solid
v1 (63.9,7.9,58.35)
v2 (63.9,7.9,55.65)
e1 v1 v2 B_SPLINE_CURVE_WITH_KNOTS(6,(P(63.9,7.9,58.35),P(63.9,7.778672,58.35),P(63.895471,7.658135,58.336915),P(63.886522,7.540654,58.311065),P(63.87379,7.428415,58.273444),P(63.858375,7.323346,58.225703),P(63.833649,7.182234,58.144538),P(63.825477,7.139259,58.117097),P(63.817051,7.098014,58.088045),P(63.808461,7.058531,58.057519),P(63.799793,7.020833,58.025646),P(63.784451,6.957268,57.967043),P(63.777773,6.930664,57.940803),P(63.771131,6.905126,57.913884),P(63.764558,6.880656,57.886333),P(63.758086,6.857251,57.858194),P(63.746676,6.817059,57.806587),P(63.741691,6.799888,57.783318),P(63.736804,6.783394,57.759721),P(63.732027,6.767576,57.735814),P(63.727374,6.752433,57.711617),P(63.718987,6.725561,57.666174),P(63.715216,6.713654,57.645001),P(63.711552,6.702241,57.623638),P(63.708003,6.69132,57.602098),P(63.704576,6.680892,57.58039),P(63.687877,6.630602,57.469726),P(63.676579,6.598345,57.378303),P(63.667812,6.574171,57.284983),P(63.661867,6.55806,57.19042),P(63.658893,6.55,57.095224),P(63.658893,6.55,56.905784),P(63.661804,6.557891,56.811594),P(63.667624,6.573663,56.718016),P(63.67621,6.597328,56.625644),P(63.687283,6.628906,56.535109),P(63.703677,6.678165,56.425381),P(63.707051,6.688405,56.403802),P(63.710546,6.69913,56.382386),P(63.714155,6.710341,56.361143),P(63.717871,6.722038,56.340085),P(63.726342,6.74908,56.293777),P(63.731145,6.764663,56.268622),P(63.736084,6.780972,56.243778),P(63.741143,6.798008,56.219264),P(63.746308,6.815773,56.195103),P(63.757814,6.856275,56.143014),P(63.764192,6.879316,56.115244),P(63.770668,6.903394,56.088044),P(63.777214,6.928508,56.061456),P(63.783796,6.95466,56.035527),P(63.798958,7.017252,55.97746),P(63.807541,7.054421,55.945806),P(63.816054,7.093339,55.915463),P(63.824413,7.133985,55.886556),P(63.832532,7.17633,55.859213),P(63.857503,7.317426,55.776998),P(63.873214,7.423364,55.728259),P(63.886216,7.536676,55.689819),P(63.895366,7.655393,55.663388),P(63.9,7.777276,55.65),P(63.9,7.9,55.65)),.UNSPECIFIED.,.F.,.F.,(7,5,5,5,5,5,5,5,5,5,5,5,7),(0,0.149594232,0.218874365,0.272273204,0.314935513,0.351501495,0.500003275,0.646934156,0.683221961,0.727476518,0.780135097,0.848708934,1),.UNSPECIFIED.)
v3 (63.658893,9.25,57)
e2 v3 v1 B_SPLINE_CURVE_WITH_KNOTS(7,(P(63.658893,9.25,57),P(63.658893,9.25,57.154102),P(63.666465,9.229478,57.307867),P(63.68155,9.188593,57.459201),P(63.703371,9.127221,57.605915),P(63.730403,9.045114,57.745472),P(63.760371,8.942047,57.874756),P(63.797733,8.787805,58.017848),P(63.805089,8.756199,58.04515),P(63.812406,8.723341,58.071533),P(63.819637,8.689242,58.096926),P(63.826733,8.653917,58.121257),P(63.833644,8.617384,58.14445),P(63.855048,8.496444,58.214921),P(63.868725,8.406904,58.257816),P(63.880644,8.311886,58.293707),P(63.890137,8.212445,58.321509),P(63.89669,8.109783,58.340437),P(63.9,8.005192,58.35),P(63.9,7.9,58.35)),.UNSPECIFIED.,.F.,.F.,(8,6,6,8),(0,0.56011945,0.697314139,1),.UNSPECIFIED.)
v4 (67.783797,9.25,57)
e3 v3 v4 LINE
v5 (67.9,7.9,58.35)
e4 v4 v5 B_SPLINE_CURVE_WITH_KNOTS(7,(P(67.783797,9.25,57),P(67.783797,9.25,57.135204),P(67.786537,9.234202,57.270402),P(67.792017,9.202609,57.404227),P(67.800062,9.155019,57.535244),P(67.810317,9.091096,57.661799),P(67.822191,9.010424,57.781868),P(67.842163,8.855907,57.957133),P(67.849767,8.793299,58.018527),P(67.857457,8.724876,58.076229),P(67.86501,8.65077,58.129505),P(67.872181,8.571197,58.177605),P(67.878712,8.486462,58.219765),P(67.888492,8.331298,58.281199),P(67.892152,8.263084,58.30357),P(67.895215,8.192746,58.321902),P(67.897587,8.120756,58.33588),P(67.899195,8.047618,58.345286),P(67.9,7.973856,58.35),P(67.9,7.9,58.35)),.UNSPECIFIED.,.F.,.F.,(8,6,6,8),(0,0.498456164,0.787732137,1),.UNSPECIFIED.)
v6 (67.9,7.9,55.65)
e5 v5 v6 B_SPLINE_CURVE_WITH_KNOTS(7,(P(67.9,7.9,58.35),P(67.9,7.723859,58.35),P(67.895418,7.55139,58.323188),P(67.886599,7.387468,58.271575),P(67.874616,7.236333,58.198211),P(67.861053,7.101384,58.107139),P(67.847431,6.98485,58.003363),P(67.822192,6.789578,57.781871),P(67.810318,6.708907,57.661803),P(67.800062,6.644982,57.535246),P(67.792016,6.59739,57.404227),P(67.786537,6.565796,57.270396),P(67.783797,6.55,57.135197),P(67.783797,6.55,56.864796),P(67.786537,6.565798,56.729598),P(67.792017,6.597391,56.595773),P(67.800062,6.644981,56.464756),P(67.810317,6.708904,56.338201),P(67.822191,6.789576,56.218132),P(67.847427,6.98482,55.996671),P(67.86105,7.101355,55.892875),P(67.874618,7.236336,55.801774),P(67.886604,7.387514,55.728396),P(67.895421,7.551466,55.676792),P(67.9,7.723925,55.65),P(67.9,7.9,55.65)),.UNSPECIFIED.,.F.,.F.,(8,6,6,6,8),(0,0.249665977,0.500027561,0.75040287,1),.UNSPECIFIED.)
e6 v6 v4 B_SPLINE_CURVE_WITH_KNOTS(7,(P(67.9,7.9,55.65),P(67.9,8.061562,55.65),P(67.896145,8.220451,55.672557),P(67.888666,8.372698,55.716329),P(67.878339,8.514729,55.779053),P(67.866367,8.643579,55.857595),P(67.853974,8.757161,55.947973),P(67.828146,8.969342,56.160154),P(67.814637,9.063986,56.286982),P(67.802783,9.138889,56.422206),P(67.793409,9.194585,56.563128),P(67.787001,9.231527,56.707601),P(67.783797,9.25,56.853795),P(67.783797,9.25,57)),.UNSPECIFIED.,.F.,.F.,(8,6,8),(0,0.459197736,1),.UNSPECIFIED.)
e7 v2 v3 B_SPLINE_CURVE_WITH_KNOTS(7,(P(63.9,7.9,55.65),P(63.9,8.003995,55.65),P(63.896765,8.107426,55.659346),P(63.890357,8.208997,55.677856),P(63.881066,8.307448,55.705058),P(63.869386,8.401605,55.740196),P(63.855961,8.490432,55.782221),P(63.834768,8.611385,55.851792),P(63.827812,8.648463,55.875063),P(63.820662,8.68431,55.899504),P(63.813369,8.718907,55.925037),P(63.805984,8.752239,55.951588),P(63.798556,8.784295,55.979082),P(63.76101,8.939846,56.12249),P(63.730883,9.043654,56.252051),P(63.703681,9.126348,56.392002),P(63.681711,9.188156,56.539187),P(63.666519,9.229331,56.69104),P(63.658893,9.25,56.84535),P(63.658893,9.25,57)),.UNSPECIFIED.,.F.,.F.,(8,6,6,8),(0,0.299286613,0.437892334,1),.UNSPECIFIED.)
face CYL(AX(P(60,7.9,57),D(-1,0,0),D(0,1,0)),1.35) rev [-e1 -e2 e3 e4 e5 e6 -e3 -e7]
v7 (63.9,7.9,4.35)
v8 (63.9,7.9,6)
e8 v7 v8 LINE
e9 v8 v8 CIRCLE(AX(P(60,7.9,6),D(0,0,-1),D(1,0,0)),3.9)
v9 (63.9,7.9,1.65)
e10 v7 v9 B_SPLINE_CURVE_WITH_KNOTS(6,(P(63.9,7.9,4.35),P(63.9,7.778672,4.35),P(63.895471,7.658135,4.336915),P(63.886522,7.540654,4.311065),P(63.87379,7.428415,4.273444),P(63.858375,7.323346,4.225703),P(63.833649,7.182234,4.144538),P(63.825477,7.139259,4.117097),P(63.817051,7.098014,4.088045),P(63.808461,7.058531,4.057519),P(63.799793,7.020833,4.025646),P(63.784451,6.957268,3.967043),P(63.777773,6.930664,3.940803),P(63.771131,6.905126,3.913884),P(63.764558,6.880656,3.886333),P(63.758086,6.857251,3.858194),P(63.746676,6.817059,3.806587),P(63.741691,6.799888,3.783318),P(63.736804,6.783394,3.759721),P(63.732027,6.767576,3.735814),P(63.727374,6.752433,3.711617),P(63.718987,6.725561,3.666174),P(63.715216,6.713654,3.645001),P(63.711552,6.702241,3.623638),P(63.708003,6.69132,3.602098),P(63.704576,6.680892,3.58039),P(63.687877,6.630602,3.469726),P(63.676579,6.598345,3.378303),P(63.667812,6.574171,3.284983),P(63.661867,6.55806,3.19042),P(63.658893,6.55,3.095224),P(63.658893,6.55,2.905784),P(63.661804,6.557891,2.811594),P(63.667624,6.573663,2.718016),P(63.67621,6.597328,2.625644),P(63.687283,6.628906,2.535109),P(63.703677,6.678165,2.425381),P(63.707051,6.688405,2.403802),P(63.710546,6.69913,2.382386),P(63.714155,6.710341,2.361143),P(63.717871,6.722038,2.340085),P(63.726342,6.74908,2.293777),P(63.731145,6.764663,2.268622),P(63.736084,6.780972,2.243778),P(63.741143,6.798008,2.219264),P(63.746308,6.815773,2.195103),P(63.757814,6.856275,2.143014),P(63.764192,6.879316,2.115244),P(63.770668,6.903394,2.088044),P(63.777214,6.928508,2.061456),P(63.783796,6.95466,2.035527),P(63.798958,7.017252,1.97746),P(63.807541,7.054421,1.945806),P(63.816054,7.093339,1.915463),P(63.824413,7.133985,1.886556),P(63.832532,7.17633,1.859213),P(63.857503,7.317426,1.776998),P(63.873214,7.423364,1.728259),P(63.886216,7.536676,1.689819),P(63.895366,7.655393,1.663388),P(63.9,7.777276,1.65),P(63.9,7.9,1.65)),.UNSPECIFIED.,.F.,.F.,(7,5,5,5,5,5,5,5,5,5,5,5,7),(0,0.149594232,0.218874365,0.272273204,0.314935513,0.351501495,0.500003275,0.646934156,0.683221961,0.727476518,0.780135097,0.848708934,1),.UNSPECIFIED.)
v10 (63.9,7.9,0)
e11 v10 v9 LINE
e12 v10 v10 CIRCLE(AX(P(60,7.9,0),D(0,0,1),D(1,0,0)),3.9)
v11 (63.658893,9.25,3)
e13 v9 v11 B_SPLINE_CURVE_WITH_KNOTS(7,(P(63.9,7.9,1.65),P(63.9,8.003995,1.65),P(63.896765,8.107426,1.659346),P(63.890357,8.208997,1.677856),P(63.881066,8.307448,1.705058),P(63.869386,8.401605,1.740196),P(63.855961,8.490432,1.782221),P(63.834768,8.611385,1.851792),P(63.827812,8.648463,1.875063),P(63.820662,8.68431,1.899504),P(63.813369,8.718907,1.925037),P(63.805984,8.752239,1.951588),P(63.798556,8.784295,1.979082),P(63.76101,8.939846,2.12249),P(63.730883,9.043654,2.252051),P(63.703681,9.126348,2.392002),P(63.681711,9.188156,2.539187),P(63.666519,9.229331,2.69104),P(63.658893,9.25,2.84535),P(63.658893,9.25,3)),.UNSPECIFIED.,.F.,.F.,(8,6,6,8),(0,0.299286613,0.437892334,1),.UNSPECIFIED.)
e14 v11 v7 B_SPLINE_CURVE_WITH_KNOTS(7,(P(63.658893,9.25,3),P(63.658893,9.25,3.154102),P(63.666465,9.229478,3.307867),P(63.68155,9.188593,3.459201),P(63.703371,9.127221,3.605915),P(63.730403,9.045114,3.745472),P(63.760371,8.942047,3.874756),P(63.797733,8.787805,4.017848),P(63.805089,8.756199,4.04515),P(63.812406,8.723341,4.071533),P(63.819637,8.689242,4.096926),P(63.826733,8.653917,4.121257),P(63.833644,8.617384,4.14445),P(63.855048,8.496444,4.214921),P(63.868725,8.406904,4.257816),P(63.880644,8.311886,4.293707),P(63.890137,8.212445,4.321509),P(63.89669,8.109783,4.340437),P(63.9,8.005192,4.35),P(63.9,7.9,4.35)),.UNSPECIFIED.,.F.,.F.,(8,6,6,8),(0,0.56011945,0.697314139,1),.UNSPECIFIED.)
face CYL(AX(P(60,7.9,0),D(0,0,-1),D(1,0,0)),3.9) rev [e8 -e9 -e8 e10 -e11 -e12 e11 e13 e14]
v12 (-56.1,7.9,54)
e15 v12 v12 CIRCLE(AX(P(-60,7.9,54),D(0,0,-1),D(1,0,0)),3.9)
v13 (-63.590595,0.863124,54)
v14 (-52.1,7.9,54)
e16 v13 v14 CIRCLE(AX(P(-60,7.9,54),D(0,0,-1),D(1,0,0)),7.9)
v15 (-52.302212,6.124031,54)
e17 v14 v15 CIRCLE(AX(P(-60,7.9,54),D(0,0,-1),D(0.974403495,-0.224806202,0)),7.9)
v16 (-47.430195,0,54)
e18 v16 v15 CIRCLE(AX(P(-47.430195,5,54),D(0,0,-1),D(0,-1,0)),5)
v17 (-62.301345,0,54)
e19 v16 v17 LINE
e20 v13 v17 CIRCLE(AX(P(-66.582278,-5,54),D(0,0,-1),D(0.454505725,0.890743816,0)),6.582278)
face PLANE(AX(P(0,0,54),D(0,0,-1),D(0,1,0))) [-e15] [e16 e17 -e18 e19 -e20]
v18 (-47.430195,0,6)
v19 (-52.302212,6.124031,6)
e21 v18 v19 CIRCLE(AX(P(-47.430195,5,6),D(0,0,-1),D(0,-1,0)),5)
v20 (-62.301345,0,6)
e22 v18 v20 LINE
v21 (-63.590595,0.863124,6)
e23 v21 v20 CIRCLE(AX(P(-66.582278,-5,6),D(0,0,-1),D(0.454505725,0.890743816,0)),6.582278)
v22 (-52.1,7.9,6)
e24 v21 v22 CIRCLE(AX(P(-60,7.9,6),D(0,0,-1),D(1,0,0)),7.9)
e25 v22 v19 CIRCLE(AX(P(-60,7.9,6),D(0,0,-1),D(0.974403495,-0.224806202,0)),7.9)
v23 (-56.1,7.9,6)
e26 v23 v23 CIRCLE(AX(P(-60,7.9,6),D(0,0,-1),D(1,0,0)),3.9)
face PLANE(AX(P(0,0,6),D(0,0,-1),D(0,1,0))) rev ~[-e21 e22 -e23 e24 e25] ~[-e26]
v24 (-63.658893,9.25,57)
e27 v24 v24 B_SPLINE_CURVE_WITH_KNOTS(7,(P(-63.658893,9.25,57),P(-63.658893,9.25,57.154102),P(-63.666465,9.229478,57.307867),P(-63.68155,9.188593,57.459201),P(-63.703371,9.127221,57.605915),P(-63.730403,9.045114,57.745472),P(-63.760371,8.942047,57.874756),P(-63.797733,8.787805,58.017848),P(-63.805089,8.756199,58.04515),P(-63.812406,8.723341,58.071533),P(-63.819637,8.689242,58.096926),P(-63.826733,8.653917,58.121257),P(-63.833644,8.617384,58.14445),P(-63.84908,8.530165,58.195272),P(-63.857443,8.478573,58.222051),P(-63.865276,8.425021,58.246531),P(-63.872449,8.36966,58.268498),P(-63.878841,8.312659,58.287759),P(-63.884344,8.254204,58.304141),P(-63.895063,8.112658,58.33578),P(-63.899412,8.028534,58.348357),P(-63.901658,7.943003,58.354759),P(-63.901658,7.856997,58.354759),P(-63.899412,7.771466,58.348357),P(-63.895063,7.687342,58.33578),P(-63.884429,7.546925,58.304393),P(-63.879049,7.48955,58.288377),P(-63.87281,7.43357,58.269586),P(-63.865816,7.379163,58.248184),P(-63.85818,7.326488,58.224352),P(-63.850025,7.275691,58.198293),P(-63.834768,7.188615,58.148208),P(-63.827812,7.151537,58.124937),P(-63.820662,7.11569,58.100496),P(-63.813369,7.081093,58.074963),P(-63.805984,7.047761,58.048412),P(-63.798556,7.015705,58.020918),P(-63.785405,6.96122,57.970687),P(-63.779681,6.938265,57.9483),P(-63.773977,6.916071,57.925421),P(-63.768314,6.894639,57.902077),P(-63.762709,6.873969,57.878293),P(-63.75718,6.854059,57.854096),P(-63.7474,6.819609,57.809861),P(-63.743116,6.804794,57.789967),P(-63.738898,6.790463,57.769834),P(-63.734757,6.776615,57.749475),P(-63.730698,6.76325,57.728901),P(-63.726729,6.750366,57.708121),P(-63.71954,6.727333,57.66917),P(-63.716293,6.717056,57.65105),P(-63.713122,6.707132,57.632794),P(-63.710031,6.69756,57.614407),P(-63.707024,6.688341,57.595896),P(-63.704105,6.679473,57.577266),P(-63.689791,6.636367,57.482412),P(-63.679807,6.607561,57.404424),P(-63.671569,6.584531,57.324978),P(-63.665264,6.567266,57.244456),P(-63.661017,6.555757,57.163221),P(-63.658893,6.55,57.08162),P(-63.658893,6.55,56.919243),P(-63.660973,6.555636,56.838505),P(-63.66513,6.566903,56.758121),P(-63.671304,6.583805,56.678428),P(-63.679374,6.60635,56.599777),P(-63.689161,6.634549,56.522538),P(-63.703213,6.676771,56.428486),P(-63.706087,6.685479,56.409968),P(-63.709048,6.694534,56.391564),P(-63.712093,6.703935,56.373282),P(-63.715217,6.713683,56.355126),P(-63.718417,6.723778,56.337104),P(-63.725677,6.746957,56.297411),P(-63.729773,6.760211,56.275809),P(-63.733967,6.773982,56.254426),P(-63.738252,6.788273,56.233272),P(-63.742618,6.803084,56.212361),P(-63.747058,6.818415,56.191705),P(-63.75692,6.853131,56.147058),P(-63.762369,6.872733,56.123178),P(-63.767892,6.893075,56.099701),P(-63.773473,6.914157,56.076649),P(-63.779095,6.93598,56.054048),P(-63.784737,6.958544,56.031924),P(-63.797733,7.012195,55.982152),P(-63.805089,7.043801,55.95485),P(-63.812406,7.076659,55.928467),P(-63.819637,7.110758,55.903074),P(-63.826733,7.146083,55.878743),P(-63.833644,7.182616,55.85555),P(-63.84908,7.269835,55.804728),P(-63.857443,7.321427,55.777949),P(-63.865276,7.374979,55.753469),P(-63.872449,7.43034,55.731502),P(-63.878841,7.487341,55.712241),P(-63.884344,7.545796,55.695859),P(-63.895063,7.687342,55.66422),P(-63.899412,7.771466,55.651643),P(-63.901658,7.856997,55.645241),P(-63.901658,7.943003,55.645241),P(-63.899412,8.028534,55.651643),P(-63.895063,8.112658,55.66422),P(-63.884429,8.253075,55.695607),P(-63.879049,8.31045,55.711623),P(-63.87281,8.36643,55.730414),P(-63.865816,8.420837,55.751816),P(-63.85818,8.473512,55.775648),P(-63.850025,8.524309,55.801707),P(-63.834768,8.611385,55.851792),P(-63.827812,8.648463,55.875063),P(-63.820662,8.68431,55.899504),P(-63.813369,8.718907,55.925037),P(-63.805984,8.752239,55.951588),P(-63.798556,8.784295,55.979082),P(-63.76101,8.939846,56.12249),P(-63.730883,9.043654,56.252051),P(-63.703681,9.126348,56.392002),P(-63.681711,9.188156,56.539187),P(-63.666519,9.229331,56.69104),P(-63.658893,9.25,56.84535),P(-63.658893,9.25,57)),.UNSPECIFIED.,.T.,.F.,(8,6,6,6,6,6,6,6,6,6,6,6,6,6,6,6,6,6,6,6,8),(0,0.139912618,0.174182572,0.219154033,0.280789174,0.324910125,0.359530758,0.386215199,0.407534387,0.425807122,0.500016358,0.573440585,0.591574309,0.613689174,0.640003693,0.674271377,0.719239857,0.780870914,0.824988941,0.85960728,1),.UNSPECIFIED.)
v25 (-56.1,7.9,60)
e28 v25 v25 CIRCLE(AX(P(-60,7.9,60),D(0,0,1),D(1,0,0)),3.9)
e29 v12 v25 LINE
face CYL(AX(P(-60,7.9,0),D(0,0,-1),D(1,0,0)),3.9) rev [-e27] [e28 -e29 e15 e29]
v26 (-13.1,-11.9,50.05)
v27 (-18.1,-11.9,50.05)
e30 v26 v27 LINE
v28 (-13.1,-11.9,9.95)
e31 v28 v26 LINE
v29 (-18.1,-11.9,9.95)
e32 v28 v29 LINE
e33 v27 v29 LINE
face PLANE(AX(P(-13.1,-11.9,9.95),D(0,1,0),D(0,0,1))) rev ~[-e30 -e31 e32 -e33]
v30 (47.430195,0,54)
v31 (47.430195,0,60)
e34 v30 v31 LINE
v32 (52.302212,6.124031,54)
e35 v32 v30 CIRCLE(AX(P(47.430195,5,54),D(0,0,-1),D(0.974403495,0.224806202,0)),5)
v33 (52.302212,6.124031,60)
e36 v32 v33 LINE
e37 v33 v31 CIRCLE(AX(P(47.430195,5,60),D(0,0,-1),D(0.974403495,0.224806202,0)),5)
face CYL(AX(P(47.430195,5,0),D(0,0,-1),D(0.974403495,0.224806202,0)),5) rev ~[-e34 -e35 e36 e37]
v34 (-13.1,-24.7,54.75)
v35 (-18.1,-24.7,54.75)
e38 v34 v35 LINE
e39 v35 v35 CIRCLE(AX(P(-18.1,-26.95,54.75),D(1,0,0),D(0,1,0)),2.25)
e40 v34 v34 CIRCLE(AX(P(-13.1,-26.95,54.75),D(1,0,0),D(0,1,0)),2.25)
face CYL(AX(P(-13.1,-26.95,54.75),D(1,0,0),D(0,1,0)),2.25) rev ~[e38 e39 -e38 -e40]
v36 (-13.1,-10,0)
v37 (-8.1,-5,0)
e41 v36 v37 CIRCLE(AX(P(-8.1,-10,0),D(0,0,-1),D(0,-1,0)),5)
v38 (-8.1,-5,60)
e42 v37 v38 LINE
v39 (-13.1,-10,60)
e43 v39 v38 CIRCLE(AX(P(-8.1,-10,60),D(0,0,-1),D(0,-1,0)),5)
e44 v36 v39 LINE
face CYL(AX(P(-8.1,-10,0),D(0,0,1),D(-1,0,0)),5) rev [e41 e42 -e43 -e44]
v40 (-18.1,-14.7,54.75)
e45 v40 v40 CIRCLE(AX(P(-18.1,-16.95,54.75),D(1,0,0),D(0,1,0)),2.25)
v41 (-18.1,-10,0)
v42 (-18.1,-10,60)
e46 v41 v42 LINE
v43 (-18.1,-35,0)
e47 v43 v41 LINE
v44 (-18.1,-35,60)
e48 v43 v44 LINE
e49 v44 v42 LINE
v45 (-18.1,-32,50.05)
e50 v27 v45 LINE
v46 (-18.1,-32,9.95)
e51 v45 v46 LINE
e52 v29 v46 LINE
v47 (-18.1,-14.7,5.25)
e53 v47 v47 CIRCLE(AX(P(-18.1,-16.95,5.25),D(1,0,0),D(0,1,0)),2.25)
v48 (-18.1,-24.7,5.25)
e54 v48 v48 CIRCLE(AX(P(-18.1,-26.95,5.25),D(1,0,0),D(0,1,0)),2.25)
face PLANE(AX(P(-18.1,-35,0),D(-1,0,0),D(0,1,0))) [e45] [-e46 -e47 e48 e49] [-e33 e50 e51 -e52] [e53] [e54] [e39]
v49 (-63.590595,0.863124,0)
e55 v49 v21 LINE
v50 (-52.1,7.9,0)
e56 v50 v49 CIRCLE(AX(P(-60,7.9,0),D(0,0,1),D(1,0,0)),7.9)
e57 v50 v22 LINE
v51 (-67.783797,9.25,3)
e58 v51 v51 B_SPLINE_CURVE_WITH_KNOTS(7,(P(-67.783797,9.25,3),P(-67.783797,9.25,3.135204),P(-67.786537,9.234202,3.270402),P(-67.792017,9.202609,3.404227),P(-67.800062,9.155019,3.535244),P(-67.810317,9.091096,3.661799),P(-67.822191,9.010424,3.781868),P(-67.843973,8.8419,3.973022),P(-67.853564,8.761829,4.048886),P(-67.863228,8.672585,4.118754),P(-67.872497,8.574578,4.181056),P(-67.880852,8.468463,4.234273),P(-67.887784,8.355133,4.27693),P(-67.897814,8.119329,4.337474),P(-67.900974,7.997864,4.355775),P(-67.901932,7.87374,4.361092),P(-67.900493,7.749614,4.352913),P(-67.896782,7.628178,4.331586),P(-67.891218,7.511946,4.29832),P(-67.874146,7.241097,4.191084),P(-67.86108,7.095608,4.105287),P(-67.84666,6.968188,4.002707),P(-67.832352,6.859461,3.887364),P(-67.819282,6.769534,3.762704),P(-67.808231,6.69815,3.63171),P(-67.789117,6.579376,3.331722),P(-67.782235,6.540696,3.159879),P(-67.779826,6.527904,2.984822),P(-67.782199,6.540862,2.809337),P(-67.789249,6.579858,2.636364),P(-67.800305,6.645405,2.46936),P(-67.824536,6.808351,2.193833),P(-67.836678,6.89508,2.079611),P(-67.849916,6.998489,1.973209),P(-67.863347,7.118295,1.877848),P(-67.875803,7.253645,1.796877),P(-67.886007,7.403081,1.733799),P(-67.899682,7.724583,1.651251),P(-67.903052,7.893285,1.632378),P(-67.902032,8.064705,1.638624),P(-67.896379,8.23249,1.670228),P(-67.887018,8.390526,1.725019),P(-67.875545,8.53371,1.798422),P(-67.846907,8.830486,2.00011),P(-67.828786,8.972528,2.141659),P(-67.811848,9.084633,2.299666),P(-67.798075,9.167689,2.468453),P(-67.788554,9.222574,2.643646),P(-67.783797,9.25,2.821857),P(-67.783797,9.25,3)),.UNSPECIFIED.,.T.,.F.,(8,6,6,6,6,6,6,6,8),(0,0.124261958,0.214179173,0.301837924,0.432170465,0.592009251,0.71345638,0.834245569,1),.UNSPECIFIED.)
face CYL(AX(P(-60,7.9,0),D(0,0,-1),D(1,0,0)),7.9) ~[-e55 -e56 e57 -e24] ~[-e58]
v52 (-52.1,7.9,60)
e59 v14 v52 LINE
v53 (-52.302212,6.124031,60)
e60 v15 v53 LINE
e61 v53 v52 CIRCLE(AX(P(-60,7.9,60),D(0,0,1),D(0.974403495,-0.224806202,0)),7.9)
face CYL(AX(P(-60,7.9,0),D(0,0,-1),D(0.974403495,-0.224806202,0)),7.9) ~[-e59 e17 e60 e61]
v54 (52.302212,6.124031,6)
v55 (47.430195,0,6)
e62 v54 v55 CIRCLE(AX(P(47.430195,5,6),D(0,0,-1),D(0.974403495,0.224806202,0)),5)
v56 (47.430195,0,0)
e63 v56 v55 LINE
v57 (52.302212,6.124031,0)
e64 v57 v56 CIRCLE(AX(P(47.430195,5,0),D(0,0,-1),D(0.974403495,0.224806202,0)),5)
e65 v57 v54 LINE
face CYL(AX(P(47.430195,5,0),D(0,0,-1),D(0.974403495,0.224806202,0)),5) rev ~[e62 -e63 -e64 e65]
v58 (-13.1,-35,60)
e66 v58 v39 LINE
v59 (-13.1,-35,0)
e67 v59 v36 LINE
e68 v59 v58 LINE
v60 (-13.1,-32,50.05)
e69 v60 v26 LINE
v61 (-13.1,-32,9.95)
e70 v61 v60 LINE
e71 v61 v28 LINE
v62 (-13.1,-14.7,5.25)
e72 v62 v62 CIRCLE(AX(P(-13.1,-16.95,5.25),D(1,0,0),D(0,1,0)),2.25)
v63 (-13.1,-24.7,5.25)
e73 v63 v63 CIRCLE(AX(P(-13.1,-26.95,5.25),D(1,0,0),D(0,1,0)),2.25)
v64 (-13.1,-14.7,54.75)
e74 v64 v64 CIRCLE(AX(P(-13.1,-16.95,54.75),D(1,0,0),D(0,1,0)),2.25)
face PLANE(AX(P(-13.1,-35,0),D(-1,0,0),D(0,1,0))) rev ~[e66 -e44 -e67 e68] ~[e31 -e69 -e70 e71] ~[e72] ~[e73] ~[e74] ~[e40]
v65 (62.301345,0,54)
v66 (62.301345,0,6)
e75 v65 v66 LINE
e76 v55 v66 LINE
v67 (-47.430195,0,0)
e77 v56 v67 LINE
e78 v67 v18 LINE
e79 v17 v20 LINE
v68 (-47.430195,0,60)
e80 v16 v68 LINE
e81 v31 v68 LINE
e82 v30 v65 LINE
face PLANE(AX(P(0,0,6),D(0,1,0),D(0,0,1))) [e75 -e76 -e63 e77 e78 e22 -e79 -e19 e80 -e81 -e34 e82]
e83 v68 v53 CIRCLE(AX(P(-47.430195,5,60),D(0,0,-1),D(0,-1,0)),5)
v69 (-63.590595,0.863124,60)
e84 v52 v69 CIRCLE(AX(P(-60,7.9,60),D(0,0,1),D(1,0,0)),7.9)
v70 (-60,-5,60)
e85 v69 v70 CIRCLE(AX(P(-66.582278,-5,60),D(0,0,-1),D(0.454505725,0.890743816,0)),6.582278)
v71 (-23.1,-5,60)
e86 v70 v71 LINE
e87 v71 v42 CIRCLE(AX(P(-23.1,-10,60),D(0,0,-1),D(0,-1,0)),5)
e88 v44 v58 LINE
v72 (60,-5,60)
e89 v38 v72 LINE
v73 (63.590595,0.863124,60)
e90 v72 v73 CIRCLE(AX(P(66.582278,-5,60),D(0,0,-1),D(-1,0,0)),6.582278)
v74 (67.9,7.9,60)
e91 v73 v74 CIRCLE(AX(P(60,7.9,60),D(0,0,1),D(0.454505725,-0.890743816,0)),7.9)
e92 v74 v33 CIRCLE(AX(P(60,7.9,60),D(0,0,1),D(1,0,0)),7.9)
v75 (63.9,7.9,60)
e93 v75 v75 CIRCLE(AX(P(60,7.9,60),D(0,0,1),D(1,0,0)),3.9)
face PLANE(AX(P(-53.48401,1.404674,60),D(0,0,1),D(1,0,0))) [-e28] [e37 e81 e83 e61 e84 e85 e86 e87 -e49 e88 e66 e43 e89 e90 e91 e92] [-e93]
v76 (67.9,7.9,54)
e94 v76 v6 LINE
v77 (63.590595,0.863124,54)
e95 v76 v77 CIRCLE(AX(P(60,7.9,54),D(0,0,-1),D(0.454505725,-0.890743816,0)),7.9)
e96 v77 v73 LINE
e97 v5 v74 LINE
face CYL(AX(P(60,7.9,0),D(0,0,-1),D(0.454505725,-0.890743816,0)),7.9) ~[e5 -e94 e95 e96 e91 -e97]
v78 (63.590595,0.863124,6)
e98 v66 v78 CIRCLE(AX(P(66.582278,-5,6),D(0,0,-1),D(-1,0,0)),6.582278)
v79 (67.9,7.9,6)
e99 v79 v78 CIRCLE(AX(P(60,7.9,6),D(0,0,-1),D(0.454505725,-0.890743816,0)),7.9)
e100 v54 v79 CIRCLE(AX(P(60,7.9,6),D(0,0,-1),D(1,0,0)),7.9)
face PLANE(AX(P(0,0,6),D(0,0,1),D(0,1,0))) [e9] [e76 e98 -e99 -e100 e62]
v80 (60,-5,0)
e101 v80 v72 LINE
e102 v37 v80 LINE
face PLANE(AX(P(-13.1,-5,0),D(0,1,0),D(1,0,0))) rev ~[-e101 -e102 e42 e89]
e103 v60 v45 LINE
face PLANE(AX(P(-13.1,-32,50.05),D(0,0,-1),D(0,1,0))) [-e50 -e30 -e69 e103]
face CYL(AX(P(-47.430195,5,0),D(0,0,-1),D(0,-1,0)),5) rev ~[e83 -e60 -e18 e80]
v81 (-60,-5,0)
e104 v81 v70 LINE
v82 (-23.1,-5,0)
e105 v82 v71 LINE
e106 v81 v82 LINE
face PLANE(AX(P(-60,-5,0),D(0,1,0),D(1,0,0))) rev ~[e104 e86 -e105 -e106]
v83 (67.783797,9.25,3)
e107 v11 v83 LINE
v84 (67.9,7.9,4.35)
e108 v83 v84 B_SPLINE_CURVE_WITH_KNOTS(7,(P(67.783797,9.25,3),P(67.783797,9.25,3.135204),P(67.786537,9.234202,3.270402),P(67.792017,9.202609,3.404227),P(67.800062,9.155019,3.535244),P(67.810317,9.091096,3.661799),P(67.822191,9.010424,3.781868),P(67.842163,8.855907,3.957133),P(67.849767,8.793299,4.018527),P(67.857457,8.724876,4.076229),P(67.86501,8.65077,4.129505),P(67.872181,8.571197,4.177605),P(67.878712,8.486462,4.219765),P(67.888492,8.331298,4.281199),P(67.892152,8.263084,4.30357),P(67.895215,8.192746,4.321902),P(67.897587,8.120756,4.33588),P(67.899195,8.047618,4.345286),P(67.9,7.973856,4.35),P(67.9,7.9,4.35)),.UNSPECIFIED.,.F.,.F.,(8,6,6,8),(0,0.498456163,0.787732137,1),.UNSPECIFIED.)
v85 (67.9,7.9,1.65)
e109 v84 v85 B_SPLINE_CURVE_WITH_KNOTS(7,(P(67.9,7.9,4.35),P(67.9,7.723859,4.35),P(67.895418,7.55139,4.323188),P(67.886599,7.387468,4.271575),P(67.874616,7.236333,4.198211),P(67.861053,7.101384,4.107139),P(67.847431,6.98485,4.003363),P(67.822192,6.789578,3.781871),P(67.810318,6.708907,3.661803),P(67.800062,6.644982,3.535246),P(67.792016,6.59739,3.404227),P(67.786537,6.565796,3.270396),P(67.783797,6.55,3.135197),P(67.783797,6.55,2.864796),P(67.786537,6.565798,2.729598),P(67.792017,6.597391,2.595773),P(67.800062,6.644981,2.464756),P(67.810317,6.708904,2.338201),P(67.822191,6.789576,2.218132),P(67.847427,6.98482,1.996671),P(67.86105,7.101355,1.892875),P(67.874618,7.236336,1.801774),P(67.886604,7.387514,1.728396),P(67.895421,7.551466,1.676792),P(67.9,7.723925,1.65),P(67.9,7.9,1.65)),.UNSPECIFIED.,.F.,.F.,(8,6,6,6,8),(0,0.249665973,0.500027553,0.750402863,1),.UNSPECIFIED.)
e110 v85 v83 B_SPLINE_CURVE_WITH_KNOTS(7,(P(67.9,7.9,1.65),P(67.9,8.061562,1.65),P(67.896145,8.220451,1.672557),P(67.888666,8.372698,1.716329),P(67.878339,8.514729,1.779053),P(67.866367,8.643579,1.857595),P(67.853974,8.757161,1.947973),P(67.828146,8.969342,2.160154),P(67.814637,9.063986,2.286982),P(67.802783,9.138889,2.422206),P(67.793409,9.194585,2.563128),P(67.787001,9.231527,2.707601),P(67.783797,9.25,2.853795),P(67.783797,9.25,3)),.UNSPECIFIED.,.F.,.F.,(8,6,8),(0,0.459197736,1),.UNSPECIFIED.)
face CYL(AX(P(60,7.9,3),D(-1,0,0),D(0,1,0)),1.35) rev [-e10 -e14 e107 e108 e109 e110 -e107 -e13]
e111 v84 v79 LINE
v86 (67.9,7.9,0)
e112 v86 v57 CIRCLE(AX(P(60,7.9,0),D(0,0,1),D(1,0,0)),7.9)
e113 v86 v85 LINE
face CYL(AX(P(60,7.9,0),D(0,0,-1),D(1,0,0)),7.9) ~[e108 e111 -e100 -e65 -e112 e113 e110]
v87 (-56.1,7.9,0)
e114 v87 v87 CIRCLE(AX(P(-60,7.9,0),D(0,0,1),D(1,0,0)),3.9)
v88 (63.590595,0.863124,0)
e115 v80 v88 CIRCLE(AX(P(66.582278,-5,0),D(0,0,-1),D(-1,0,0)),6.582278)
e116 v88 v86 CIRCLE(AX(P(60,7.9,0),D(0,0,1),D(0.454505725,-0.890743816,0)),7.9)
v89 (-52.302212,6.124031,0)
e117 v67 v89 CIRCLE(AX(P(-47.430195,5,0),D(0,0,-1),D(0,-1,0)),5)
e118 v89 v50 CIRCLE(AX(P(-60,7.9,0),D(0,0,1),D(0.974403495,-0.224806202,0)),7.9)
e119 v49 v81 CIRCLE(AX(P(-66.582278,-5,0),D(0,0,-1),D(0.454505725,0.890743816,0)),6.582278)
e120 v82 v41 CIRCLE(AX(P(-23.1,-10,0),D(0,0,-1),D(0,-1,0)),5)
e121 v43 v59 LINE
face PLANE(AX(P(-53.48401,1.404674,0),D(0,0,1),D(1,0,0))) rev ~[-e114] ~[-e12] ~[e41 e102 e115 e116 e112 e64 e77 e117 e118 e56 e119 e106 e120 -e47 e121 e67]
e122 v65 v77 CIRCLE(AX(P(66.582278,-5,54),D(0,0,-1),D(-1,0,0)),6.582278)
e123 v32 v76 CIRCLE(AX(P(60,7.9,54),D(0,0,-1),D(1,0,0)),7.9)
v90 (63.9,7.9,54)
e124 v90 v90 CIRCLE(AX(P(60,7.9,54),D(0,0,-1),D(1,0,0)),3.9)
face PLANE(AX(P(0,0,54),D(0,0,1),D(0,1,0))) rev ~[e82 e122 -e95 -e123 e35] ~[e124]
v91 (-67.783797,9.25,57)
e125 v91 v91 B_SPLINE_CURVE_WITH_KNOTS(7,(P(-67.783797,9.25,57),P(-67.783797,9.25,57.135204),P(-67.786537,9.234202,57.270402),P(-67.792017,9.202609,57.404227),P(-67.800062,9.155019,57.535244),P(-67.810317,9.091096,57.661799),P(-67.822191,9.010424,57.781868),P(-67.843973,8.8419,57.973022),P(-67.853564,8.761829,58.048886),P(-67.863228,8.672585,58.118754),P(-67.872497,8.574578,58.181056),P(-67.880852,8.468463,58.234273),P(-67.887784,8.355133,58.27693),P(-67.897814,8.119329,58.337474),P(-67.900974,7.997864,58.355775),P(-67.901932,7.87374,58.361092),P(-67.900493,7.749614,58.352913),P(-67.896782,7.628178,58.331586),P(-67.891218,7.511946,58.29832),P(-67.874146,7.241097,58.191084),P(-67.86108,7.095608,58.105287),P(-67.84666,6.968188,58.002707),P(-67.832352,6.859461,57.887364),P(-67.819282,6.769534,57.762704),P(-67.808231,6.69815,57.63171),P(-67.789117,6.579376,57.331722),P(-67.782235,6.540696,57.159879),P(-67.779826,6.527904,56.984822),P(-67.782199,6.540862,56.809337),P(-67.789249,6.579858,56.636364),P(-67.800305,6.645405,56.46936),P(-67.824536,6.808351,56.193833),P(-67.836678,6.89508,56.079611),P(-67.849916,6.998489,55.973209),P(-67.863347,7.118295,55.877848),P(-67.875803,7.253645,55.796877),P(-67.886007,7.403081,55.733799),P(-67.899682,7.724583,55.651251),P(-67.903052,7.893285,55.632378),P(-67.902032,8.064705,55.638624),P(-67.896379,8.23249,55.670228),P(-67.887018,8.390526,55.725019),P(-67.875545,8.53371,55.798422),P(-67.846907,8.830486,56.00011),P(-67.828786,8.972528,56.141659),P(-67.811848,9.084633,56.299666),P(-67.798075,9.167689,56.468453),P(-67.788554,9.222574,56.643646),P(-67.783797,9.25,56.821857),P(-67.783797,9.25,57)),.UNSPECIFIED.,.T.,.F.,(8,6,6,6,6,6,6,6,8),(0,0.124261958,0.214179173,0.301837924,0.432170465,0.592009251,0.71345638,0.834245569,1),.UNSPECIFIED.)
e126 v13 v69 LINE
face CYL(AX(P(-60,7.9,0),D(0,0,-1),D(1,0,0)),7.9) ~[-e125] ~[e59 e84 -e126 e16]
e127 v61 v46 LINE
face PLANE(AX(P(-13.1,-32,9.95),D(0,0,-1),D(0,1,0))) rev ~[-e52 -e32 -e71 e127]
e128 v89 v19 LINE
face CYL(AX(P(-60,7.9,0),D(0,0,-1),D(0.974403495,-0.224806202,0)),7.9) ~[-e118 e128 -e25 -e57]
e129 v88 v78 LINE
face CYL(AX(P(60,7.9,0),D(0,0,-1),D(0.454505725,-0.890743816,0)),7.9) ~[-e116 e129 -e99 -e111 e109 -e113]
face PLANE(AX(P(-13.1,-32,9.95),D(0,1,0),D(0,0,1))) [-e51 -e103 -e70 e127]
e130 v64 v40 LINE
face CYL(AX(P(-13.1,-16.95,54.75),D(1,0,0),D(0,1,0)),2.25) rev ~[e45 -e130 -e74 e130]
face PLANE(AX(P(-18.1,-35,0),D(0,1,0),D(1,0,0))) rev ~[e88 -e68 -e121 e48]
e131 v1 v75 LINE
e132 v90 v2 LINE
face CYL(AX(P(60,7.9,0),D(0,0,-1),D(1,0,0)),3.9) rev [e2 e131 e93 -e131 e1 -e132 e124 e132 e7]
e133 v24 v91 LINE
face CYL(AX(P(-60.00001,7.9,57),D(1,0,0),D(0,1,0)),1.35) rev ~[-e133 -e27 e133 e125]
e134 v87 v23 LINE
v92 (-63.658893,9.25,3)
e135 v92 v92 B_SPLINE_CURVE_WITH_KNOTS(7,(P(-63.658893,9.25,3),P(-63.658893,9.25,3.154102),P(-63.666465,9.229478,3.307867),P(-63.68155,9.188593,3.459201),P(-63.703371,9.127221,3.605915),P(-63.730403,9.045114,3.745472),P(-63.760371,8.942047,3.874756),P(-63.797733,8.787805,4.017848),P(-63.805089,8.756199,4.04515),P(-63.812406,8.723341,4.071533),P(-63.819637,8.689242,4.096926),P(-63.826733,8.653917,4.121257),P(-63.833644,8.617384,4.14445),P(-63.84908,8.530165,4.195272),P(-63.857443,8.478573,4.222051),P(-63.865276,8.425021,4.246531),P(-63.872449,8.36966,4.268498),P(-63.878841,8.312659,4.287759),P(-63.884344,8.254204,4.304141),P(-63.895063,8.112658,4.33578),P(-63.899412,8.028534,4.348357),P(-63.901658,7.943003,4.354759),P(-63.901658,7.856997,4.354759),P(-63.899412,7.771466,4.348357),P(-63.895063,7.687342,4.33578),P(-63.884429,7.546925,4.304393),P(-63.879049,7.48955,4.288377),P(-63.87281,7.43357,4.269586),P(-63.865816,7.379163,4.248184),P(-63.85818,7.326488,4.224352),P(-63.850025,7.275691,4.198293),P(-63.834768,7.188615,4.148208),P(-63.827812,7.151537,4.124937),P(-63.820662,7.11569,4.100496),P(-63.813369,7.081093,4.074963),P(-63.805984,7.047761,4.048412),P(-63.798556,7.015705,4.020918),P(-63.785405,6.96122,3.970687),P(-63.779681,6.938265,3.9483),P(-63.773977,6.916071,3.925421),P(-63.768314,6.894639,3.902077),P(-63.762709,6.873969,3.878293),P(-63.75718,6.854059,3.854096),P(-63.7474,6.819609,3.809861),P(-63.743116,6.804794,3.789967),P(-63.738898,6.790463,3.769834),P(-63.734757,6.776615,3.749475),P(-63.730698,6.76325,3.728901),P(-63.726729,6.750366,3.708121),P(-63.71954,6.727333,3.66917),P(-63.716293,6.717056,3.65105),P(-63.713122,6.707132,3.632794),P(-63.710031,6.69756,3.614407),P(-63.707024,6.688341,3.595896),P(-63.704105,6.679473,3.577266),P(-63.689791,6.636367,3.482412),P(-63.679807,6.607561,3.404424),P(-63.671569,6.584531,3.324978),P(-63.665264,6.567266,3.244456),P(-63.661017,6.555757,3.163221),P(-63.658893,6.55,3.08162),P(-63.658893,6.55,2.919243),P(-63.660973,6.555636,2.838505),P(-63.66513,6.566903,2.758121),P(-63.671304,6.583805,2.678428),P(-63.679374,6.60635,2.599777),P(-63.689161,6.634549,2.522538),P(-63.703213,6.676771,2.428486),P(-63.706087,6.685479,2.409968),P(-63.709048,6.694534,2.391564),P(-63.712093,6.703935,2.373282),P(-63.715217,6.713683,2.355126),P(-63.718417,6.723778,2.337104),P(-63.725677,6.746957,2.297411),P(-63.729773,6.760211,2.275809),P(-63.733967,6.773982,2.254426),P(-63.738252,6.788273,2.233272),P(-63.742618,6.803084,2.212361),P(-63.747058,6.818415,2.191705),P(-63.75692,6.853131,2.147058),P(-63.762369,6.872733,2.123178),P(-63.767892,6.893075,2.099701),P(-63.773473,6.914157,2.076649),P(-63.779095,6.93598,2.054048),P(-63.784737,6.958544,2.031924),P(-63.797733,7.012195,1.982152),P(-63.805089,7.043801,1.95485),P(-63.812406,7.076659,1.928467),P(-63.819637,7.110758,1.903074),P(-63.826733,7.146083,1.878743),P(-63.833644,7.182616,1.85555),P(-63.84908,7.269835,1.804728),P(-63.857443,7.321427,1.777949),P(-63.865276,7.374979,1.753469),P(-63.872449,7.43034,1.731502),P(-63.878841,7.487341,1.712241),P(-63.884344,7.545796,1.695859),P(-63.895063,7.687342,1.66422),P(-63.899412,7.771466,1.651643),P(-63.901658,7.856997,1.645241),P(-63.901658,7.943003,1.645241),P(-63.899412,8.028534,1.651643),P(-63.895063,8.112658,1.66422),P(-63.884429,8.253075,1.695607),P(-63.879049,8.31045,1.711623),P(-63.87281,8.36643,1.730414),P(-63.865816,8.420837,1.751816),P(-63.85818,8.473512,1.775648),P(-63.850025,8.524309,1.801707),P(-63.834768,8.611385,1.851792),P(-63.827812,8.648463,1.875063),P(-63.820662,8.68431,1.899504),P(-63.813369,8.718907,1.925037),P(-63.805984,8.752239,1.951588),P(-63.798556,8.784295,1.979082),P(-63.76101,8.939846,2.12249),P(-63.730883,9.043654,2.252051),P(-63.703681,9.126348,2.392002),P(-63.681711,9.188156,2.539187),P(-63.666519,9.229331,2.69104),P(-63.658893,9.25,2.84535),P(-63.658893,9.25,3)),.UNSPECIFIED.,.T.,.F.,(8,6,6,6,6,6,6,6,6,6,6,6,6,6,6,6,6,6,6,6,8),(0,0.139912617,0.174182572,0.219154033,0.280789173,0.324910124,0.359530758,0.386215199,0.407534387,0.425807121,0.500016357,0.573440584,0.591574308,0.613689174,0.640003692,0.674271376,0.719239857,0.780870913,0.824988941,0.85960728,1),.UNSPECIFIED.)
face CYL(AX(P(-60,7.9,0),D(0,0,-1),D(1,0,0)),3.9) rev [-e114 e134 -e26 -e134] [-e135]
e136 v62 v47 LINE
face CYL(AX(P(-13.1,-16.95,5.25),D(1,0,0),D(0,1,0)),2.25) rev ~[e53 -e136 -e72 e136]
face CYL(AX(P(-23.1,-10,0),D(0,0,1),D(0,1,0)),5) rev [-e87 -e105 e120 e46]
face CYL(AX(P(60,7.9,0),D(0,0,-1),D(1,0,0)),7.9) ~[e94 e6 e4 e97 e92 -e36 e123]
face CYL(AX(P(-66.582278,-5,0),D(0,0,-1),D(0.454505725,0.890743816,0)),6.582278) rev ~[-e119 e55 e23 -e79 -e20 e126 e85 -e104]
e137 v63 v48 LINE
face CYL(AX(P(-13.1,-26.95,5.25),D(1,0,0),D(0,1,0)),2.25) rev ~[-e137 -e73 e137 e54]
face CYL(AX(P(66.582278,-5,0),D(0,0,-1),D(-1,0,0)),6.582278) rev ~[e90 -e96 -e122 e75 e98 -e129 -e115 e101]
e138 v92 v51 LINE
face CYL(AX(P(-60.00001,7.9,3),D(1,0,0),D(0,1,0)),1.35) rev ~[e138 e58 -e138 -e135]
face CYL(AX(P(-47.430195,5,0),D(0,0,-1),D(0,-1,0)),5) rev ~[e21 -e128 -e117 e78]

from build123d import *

# Parameters (mm, degrees)
F0_R          = 3.9
F0_W          = 5
F0_H          = 30
F1_DEPTH      = 60
F2_W          = 20.1
F2_H          = 40.1
F2_R          = 2.25
F3_DEPTH      = 54.801
F5_W          = 34.2169012874
F5_H          = 48
F6_DEPTH      = 67.901
F6_DEPTH_BACK = 67.901
F7_R          = 5
F9_R          = 1.35
F10_DEPTH     = 7.901


# Not quite as in the source:
# - a pattern or mirror of a feature is missing from the dataset's text; its kind, count and spacing are read off the source's solid


with BuildPart() as f1:
    # F0 (on Top) → F1 (new body)
    with BuildSketch(Plane.XY):
        with BuildLine():
            ThreePointArc((-52.3022123868, 6.1240310078), (-55.0816748297, 1.717761124), (-60, 0))
            Line((-60, 0), (-47.43019491, 0))
            ThreePointArc((-47.43019491, 0), (-51.3430043252, 1.8871359682), (-52.3022123868, 6.1240310078))
        make_face()
        Polygon((-47.43019491, 0), (-60, 0), (-60, -5), (-18.1, -5), (-13.1, -5), (60, -5), (60, 0), (47.43019491, 0), align=None)
        with BuildLine():
            Line((-60, -5), (-60, 0))
            ThreePointArc((-60, 0), (-61.846439606, 0.218811239), (-63.5905952277, 0.8631238528))
            ThreePointArc((-63.5905952277, 0.8631238528), (-60.9689691941, -1.5623919871), (-60, -5))
        make_face()
        with BuildLine():
            ThreePointArc((-63.5905952277, 0.8631238528), (-61.846439606, 0.218811239), (-60, 0))
            ThreePointArc((-60, 0), (-55.0816748297, 1.717761124), (-52.3022123868, 6.1240310078))
            ThreePointArc((-52.3022123868, 6.1240310078), (-52.1507158879, 7.0062780479), (-52.1, 7.9))
            ThreePointArc((-52.1, 7.9), (-64.125790694, 14.6370506269), (-63.5905952277, 0.8631238528))
        make_face()
        with Locations((-60, 7.9)):
            Circle(F0_R, mode=Mode.SUBTRACT)
        with BuildLine():
            ThreePointArc((52.3022123868, 6.1240310078), (51.3430043252, 1.8871359682), (47.43019491, 0))
            Line((47.43019491, 0), (60, 0))
            ThreePointArc((60, 0), (55.0816748297, 1.717761124), (52.3022123868, 6.1240310078))
        make_face()
        with Locations((-15.6, -20)):
            Rectangle(F0_W, F0_H)
        with BuildLine():
            ThreePointArc((63.5905952277, 0.8631238528), (61.846439606, 0.218811239), (60, 0))
            Line((60, 0), (60, -5))
            ThreePointArc((60, -5), (60.9689691941, -1.5623919871), (63.5905952277, 0.8631238528))
        make_face()
        with BuildLine():
            ThreePointArc((52.3022123868, 6.1240310078), (55.0816748297, 1.717761124), (60, 0))
            ThreePointArc((60, 0), (61.846439606, 0.218811239), (63.5905952277, 0.8631238528))
            ThreePointArc((63.5905952277, 0.8631238528), (66.7370506269, 3.774209306), (67.9, 7.9))
            ThreePointArc((67.9, 7.9), (59.1062780479, 15.7492841121), (52.3022123868, 6.1240310078))
        make_face()
        with Locations((60, 7.9)):
            Circle(F0_R, mode=Mode.SUBTRACT)
    extrude(amount=F1_DEPTH)

    # F2 (on face) → F3 (cut, through all)
    with BuildSketch(Plane.YZ.offset(-13.1)):
        with Locations((-21.95, 30)):
            Rectangle(F2_W, F2_H)
        with Locations((-26.95, 54.75)):
            Circle(F2_R)
        with Locations((-16.95, 54.75)):
            Circle(F2_R)
        with Locations((-16.95, 5.25)):
            Circle(F2_R)
        with Locations((-26.95, 5.25)):
            Circle(F2_R)
    extrude(amount=-F3_DEPTH, mode=Mode.SUBTRACT)

    # F5 (on Right) → F6 (cut, two sides)
    with BuildSketch(Plane.YZ) as f6_sk:
        with Locations((17.1084506437, 30)):
            Rectangle(F5_W, F5_H)
    extrude(amount=-F6_DEPTH, mode=Mode.SUBTRACT)
    extrude(f6_sk.sketch, amount=F6_DEPTH_BACK, mode=Mode.SUBTRACT)

    # F7
    f7_edges = [f1.edges().sort_by_distance(p)[0] for p in [
        (-13.1, -5, 30),
        (-18.1, -5, 30),
    ]]
    fillet(f7_edges, radius=F7_R)

    # F9 (on offset) → F10 (cut, through all)
    with BuildSketch(Plane.YZ.offset(60)):
        with Locations((7.9, 57)):
            Circle(F9_R)
        with Locations((7.9, 3)):
            Circle(F9_R)
    f10 = extrude(amount=F10_DEPTH, mode=Mode.SUBTRACT)

    # F10_copies: F10 across plane
    add(f10.mirror(Plane(origin=(-5e-06, 0, 0), x_dir=(0, 0, -1), z_dir=(-1, 0, 0))), mode=Mode.SUBTRACT)


solid = f1.part
